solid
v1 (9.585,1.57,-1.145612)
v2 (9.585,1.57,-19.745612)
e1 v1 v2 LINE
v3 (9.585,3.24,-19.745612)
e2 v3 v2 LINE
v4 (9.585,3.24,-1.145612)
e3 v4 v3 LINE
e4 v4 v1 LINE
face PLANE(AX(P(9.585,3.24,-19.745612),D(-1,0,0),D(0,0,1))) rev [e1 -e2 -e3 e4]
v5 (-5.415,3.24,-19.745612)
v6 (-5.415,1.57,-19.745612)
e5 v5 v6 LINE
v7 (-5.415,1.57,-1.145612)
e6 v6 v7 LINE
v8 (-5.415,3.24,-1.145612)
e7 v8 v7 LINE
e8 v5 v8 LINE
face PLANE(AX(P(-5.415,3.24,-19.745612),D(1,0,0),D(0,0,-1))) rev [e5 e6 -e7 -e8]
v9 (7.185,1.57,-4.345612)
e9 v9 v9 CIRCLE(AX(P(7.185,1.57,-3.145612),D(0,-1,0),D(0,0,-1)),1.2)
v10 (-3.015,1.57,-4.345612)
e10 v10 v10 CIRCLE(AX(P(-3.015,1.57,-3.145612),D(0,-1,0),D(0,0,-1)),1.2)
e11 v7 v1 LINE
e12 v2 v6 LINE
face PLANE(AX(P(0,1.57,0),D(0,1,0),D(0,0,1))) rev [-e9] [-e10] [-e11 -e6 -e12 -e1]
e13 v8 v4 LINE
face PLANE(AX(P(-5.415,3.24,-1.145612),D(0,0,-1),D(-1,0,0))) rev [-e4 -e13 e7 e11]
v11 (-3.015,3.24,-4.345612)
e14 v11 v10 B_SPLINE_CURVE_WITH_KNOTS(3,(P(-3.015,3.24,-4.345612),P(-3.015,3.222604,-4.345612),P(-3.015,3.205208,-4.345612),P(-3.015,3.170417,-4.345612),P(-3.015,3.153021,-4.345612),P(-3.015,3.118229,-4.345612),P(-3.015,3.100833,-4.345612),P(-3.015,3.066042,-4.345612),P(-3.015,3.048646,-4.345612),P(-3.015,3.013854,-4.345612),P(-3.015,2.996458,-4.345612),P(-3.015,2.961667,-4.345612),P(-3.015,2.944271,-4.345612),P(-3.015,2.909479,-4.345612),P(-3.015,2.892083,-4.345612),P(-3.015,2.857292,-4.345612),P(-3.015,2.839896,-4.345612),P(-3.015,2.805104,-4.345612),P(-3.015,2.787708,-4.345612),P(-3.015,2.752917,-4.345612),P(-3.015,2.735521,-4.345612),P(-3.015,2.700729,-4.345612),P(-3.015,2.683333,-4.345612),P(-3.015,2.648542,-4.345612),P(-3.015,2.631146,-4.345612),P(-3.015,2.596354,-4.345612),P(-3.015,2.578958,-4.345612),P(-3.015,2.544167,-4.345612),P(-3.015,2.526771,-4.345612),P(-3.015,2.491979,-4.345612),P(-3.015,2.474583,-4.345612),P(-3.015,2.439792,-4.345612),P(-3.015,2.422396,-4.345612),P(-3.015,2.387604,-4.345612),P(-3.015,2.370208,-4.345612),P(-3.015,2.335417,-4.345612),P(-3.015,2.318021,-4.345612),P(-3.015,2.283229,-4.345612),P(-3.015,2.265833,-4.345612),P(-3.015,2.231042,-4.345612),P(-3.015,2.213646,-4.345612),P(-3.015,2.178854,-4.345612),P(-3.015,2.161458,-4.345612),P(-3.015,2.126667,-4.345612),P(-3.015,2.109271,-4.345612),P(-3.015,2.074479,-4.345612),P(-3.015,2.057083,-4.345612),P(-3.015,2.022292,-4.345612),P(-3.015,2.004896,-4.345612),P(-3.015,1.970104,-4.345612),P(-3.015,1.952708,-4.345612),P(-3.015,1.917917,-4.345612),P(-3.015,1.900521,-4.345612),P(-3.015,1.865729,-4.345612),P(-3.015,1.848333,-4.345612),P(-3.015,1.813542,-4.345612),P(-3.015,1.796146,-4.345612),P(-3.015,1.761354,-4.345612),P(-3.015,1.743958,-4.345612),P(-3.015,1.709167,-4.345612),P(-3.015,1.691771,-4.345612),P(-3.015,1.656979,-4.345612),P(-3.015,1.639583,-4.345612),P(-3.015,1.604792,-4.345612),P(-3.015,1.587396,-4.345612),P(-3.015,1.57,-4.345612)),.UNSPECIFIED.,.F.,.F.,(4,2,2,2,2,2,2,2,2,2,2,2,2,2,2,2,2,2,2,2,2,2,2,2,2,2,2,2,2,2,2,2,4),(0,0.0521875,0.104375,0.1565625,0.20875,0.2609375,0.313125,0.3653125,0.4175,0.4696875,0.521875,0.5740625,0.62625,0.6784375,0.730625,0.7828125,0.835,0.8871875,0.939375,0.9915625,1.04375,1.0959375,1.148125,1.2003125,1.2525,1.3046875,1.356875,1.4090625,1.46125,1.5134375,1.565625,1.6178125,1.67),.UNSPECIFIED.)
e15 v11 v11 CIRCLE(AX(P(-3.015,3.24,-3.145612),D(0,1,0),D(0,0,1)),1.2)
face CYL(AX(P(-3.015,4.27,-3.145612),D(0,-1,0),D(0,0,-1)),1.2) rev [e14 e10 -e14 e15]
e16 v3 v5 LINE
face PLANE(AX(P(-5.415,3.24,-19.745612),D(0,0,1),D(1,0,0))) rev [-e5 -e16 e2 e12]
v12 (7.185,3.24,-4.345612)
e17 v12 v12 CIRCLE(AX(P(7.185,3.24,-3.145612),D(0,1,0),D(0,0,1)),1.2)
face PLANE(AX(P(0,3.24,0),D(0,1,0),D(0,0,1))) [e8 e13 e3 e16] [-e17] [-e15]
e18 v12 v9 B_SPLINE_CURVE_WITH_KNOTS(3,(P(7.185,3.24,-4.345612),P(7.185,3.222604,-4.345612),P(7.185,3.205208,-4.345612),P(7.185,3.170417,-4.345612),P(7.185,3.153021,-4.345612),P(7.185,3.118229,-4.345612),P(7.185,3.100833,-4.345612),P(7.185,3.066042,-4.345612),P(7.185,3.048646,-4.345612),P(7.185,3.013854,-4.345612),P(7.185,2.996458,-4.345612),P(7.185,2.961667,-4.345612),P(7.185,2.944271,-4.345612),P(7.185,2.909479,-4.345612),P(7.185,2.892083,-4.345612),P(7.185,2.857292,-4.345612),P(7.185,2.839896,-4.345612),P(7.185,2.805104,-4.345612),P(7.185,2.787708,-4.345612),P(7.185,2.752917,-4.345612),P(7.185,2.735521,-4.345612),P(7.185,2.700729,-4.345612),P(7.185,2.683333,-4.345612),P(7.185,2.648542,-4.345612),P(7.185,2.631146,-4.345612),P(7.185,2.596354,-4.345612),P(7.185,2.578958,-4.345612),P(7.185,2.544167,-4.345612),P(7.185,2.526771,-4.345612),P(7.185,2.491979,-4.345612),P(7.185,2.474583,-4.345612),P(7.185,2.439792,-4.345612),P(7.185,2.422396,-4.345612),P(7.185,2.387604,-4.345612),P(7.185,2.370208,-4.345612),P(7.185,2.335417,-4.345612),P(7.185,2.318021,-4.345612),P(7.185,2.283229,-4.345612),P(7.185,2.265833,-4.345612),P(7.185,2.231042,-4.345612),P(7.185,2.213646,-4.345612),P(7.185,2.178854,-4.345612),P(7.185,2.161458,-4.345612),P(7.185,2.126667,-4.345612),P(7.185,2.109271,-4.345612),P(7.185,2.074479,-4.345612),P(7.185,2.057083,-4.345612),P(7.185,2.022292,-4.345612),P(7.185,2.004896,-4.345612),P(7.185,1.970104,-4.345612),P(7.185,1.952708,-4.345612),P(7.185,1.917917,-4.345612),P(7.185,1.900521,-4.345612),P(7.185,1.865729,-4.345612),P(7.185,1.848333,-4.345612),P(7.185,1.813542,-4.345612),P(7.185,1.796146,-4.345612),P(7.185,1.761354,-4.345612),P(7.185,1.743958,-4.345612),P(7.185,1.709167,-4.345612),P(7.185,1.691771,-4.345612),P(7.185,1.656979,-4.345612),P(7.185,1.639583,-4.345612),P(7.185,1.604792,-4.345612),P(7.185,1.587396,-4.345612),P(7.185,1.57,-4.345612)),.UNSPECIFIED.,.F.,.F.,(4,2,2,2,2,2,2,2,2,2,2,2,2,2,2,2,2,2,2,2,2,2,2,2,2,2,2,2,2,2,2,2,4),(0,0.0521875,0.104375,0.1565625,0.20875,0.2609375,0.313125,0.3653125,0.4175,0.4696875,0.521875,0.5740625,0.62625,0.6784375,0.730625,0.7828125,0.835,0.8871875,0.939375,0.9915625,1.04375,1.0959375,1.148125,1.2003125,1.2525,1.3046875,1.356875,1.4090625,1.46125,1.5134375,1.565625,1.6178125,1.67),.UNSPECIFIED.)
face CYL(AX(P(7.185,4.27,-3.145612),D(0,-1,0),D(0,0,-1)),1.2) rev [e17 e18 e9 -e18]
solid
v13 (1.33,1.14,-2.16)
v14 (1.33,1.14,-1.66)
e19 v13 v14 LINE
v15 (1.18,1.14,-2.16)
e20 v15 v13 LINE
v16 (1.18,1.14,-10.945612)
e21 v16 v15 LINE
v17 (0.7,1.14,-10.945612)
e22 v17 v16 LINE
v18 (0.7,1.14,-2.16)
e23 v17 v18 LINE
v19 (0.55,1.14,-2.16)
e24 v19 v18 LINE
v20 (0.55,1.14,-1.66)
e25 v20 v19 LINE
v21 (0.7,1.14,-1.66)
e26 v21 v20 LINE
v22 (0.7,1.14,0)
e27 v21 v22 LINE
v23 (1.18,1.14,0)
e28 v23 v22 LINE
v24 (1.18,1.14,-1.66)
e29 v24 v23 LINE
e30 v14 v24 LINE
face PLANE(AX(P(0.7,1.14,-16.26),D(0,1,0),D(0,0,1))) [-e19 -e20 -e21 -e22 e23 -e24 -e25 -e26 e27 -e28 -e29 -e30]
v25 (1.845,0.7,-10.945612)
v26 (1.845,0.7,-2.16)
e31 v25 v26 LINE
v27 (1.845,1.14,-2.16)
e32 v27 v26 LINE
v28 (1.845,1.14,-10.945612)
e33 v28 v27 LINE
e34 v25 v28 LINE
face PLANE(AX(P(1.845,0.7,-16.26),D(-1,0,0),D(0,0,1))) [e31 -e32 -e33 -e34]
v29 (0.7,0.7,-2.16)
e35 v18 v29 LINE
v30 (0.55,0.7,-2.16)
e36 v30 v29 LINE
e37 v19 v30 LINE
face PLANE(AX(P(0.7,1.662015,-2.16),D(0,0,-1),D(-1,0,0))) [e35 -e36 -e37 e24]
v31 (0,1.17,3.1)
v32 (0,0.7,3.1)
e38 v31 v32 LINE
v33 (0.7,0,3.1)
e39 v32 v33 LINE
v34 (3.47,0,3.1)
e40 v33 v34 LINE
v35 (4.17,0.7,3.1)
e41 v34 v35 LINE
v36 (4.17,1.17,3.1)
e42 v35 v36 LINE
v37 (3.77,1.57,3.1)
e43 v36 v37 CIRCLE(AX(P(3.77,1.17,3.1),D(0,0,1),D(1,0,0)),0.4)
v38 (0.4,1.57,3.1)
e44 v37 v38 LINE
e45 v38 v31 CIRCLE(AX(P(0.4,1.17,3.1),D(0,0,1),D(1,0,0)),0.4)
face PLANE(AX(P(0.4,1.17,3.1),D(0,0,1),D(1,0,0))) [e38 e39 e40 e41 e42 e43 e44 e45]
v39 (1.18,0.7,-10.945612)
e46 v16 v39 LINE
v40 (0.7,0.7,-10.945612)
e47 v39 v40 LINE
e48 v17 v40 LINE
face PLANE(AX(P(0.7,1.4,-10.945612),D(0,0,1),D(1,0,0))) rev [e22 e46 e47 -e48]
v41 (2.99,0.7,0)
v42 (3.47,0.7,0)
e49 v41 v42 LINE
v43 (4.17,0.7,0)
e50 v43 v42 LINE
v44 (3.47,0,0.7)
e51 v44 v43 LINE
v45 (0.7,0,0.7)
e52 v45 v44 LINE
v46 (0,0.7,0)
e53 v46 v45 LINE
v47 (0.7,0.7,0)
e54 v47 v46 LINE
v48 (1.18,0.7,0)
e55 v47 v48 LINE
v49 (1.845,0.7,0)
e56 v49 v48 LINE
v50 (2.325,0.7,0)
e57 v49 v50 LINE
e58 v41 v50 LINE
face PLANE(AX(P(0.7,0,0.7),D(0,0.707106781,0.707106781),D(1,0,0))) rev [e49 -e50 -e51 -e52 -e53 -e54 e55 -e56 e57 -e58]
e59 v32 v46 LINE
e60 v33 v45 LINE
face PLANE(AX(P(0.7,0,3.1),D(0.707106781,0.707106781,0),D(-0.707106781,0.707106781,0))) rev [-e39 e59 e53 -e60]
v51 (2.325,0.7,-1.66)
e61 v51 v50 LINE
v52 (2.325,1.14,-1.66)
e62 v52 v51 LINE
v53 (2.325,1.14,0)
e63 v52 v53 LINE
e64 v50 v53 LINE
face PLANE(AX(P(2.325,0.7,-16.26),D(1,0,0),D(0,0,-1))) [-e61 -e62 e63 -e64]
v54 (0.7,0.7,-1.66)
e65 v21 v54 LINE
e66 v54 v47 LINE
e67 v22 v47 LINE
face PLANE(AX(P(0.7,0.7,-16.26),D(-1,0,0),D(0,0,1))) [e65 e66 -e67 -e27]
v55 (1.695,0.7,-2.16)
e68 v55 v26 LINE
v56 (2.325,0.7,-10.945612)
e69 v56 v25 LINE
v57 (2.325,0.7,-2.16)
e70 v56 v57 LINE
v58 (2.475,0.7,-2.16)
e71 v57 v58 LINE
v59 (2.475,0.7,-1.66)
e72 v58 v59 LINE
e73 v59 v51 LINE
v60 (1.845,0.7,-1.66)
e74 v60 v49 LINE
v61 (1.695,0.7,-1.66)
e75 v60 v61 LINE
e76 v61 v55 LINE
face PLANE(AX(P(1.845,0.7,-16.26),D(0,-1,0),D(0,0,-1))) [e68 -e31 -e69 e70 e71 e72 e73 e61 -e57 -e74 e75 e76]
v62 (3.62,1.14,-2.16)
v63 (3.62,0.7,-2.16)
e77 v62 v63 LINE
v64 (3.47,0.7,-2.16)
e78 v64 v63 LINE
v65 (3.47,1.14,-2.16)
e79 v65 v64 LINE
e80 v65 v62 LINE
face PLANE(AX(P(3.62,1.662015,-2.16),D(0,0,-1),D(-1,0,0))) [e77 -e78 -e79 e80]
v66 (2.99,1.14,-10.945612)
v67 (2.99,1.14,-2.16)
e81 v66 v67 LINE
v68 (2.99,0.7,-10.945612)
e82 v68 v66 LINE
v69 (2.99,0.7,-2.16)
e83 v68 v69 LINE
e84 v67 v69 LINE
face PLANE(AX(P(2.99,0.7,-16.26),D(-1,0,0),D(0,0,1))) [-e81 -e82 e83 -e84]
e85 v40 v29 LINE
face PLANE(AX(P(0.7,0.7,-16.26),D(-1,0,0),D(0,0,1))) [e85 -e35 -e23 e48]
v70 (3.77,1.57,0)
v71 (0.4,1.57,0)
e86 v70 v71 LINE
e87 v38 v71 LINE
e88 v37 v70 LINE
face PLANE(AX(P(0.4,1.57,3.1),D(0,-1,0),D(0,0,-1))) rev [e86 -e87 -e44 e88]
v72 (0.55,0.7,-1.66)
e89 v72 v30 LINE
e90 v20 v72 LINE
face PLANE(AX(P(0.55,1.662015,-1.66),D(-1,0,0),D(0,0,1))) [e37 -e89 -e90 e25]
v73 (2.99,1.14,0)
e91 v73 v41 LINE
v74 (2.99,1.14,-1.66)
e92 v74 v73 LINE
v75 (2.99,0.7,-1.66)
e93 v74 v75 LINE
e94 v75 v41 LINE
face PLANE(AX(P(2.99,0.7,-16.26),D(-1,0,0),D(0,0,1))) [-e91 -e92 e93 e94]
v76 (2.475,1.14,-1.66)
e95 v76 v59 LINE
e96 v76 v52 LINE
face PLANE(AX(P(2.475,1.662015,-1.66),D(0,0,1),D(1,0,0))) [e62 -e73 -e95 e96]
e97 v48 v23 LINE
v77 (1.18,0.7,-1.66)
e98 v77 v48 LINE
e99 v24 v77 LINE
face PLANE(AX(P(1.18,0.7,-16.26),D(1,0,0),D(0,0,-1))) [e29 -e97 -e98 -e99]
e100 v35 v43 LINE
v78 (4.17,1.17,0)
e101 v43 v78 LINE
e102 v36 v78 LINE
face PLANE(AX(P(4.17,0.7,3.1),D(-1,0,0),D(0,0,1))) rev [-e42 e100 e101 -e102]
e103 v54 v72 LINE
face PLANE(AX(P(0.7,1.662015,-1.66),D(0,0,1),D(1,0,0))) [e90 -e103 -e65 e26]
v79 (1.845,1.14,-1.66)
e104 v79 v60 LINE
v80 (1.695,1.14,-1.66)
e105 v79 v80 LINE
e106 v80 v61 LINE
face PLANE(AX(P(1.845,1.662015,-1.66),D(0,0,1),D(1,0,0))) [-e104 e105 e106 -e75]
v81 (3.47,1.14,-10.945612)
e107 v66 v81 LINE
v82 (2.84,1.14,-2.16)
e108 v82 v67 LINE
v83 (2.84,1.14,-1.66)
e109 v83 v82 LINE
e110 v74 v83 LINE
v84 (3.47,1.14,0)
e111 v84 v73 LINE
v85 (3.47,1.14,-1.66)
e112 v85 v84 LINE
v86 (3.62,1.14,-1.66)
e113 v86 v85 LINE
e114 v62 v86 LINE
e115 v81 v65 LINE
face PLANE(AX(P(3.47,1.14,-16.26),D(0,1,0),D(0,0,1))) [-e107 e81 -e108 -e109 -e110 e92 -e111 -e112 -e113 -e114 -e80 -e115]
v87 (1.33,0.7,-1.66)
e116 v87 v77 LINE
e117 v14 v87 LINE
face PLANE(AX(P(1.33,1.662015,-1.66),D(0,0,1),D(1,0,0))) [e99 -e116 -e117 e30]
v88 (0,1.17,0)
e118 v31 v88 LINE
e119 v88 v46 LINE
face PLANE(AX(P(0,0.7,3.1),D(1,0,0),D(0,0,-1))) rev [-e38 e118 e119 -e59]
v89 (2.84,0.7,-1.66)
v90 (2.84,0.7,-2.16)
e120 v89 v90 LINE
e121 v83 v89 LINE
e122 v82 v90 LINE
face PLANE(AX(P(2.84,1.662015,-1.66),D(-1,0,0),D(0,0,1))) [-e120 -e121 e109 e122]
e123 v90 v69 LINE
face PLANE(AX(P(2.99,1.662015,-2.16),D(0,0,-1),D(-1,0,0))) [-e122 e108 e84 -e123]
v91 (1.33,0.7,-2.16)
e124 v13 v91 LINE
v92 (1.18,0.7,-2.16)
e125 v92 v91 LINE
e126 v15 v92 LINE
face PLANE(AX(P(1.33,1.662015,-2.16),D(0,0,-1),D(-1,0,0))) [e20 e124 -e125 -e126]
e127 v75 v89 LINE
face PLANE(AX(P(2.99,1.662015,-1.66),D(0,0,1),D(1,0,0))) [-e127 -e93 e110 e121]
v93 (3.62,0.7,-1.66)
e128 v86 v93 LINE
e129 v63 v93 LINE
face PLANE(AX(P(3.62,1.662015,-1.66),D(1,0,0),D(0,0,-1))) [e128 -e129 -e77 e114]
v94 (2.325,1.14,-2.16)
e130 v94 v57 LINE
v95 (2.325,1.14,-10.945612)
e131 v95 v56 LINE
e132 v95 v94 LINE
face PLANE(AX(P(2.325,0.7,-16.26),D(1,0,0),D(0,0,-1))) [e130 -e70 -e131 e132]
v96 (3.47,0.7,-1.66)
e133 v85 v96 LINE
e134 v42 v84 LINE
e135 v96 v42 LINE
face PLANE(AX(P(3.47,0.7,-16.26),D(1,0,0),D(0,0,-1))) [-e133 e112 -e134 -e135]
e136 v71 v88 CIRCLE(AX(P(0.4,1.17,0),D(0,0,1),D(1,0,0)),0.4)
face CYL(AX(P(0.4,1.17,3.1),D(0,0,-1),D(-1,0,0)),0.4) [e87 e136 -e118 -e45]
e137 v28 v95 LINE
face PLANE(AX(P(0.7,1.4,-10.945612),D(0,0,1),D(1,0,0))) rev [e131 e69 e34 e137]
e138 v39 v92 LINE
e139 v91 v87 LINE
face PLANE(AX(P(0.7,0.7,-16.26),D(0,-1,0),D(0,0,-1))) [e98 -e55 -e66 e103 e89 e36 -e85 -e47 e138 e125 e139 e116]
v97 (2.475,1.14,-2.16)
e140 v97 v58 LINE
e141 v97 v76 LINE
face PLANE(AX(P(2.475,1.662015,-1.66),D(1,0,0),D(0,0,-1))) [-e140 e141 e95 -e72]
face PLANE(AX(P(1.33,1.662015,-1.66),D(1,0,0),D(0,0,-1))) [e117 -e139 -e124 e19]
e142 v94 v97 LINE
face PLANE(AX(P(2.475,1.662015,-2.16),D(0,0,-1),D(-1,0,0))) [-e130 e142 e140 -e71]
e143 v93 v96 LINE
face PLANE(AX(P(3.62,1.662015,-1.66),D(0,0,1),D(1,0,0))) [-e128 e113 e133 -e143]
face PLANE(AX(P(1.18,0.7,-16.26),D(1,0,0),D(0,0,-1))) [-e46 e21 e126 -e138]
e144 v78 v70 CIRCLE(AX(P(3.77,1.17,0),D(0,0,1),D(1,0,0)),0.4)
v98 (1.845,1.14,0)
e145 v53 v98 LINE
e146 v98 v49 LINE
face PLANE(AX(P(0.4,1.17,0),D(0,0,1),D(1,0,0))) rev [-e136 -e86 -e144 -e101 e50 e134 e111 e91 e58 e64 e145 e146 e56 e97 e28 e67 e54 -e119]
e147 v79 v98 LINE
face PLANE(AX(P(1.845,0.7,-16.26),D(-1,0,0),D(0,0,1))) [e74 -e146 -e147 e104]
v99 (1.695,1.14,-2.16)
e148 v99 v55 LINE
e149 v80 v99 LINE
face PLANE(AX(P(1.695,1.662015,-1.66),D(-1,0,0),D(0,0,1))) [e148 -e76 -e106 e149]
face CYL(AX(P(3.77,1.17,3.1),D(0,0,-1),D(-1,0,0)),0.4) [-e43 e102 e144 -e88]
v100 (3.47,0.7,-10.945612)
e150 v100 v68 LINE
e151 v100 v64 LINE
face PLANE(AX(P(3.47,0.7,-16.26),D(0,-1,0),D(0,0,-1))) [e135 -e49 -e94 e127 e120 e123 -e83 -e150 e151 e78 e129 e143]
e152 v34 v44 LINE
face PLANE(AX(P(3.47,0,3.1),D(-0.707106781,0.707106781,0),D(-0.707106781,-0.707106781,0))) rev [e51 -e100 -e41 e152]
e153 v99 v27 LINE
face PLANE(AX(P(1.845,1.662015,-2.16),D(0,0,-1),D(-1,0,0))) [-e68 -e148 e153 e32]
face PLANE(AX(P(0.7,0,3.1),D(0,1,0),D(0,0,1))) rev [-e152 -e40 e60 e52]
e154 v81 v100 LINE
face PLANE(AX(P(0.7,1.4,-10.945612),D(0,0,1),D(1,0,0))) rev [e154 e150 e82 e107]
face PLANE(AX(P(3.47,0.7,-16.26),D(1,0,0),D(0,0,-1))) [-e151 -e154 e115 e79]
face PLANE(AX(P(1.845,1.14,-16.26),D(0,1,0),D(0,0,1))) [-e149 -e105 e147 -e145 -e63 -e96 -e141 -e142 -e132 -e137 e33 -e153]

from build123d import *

# Parameters (mm, degrees)
RESSALTO_EXTRUS_O1_DEPTH = 3.1
ESBO_O3_W                = 0.48
ESBO_O3_H                = 0.44
RESSALTO_EXTRUS_O2_DEPTH = 16.26
CHANFRO1_SIZE            = 0.7
ESBO_O5_W                = 0.15
ESBO_O5_H                = 0.5
RESSALTO_EXTRUS_O4_DEPTH = 0.44
SKETCH2_W                = 15
SKETCH2_H                = 18.6
BOSS_EXTRUDE1_DEPTH      = 1.67
SKETCH3_W                = 2.77
SKETCH3_H                = 5.31438776
CUT_EXTRUDE1_DEPTH       = 0.7
SKETCH4_R                = 1.2
CUT_EXTRUDE2_DEPTH       = 2.7


with BuildPart() as part:
    # Esboço1 → Ressalto-extrusão1 (new body)
    with BuildSketch(Plane.XY):
        with BuildLine():
            Line((0.7, 0), (0, 0.7))
            Line((0, 0.7), (0, 1.17))
            ThreePointArc((0, 1.17), (0.117157288, 1.452842712), (0.4, 1.57))
            Line((0.4, 1.57), (3.77, 1.57))
            ThreePointArc((3.77, 1.57), (4.052842712, 1.452842712), (4.17, 1.17))
            Line((4.17, 1.17), (4.17, 0.7))
            Line((4.17, 0.7), (3.47, 0))
            Line((3.47, 0), (0.7, 0))
        make_face()
    extrude(amount=RESSALTO_EXTRUS_O1_DEPTH)

    # Esboço3 → Ressalto-extrusão2 (add)
    with BuildSketch(Plane.XY):
        with Locations((3.23, 0.92)):
            Rectangle(ESBO_O3_W, ESBO_O3_H)
        with Locations((0.94, 0.92)):
            Rectangle(ESBO_O3_W, ESBO_O3_H)
        with Locations((2.085, 0.92)):
            Rectangle(ESBO_O3_W, ESBO_O3_H)
    extrude(amount=-RESSALTO_EXTRUS_O2_DEPTH)

    # Chanfro1
    chanfro1_edges = [part.edges().sort_by_distance(p)[0] for p in [
        (2.085, 0, 0),
    ]]
    chamfer(chanfro1_edges, length=CHANFRO1_SIZE - 0.0001)  # a hair under: the kernel refuses the full size

    # Esboço5 → Ressalto-extrusão4 (add)
    with BuildSketch(Plane.XZ.offset(-0.7)):
        with Locations((0.625, -1.91)):
            Rectangle(ESBO_O5_W, ESBO_O5_H)
        with Locations((1.255, -1.91)):
            Rectangle(ESBO_O5_W, ESBO_O5_H)
        with Locations((2.4, -1.91)):
            Rectangle(ESBO_O5_W, ESBO_O5_H)
        with Locations((3.545, -1.91)):
            Rectangle(ESBO_O5_W, ESBO_O5_H)
        with Locations((1.77, -1.91)):
            Rectangle(ESBO_O5_W, ESBO_O5_H)
        with Locations((2.915, -1.91)):
            Rectangle(ESBO_O5_W, ESBO_O5_H)
    extrude(amount=-RESSALTO_EXTRUS_O4_DEPTH)

    # Sketch3 → Cut-Extrude1 (cut)
    with BuildSketch(Plane.XZ.offset(-0.7)):
        with Locations((2.085, -13.60280612)):
            Rectangle(SKETCH3_W, SKETCH3_H)
    extrude(amount=-CUT_EXTRUDE1_DEPTH, mode=Mode.SUBTRACT)


with BuildPart() as body_2:
    # Sketch2 → Boss-Extrude1 (new body)
    with BuildSketch(Plane(origin=(0, 1.57, 0), x_dir=(1, 0, 0), z_dir=(0, 1, 0))):
        with Locations((2.085, 10.44561224)):
            Rectangle(SKETCH2_W, SKETCH2_H)
    extrude(amount=BOSS_EXTRUDE1_DEPTH)

    # Sketch4 → Cut-Extrude2 (cut)
    with BuildSketch(Plane.XZ.offset(-1.57)):
        with Locations(Location((-3.015, -3.14561224, 0), (0, 0, 270))):
            Circle(SKETCH4_R)
        with Locations(Location((7.185, -3.14561224, 0), (0, 0, 270))):
            Circle(SKETCH4_R)
    extrude(amount=-CUT_EXTRUDE2_DEPTH, mode=Mode.SUBTRACT)


solid = Compound([part.part, body_2.part])
